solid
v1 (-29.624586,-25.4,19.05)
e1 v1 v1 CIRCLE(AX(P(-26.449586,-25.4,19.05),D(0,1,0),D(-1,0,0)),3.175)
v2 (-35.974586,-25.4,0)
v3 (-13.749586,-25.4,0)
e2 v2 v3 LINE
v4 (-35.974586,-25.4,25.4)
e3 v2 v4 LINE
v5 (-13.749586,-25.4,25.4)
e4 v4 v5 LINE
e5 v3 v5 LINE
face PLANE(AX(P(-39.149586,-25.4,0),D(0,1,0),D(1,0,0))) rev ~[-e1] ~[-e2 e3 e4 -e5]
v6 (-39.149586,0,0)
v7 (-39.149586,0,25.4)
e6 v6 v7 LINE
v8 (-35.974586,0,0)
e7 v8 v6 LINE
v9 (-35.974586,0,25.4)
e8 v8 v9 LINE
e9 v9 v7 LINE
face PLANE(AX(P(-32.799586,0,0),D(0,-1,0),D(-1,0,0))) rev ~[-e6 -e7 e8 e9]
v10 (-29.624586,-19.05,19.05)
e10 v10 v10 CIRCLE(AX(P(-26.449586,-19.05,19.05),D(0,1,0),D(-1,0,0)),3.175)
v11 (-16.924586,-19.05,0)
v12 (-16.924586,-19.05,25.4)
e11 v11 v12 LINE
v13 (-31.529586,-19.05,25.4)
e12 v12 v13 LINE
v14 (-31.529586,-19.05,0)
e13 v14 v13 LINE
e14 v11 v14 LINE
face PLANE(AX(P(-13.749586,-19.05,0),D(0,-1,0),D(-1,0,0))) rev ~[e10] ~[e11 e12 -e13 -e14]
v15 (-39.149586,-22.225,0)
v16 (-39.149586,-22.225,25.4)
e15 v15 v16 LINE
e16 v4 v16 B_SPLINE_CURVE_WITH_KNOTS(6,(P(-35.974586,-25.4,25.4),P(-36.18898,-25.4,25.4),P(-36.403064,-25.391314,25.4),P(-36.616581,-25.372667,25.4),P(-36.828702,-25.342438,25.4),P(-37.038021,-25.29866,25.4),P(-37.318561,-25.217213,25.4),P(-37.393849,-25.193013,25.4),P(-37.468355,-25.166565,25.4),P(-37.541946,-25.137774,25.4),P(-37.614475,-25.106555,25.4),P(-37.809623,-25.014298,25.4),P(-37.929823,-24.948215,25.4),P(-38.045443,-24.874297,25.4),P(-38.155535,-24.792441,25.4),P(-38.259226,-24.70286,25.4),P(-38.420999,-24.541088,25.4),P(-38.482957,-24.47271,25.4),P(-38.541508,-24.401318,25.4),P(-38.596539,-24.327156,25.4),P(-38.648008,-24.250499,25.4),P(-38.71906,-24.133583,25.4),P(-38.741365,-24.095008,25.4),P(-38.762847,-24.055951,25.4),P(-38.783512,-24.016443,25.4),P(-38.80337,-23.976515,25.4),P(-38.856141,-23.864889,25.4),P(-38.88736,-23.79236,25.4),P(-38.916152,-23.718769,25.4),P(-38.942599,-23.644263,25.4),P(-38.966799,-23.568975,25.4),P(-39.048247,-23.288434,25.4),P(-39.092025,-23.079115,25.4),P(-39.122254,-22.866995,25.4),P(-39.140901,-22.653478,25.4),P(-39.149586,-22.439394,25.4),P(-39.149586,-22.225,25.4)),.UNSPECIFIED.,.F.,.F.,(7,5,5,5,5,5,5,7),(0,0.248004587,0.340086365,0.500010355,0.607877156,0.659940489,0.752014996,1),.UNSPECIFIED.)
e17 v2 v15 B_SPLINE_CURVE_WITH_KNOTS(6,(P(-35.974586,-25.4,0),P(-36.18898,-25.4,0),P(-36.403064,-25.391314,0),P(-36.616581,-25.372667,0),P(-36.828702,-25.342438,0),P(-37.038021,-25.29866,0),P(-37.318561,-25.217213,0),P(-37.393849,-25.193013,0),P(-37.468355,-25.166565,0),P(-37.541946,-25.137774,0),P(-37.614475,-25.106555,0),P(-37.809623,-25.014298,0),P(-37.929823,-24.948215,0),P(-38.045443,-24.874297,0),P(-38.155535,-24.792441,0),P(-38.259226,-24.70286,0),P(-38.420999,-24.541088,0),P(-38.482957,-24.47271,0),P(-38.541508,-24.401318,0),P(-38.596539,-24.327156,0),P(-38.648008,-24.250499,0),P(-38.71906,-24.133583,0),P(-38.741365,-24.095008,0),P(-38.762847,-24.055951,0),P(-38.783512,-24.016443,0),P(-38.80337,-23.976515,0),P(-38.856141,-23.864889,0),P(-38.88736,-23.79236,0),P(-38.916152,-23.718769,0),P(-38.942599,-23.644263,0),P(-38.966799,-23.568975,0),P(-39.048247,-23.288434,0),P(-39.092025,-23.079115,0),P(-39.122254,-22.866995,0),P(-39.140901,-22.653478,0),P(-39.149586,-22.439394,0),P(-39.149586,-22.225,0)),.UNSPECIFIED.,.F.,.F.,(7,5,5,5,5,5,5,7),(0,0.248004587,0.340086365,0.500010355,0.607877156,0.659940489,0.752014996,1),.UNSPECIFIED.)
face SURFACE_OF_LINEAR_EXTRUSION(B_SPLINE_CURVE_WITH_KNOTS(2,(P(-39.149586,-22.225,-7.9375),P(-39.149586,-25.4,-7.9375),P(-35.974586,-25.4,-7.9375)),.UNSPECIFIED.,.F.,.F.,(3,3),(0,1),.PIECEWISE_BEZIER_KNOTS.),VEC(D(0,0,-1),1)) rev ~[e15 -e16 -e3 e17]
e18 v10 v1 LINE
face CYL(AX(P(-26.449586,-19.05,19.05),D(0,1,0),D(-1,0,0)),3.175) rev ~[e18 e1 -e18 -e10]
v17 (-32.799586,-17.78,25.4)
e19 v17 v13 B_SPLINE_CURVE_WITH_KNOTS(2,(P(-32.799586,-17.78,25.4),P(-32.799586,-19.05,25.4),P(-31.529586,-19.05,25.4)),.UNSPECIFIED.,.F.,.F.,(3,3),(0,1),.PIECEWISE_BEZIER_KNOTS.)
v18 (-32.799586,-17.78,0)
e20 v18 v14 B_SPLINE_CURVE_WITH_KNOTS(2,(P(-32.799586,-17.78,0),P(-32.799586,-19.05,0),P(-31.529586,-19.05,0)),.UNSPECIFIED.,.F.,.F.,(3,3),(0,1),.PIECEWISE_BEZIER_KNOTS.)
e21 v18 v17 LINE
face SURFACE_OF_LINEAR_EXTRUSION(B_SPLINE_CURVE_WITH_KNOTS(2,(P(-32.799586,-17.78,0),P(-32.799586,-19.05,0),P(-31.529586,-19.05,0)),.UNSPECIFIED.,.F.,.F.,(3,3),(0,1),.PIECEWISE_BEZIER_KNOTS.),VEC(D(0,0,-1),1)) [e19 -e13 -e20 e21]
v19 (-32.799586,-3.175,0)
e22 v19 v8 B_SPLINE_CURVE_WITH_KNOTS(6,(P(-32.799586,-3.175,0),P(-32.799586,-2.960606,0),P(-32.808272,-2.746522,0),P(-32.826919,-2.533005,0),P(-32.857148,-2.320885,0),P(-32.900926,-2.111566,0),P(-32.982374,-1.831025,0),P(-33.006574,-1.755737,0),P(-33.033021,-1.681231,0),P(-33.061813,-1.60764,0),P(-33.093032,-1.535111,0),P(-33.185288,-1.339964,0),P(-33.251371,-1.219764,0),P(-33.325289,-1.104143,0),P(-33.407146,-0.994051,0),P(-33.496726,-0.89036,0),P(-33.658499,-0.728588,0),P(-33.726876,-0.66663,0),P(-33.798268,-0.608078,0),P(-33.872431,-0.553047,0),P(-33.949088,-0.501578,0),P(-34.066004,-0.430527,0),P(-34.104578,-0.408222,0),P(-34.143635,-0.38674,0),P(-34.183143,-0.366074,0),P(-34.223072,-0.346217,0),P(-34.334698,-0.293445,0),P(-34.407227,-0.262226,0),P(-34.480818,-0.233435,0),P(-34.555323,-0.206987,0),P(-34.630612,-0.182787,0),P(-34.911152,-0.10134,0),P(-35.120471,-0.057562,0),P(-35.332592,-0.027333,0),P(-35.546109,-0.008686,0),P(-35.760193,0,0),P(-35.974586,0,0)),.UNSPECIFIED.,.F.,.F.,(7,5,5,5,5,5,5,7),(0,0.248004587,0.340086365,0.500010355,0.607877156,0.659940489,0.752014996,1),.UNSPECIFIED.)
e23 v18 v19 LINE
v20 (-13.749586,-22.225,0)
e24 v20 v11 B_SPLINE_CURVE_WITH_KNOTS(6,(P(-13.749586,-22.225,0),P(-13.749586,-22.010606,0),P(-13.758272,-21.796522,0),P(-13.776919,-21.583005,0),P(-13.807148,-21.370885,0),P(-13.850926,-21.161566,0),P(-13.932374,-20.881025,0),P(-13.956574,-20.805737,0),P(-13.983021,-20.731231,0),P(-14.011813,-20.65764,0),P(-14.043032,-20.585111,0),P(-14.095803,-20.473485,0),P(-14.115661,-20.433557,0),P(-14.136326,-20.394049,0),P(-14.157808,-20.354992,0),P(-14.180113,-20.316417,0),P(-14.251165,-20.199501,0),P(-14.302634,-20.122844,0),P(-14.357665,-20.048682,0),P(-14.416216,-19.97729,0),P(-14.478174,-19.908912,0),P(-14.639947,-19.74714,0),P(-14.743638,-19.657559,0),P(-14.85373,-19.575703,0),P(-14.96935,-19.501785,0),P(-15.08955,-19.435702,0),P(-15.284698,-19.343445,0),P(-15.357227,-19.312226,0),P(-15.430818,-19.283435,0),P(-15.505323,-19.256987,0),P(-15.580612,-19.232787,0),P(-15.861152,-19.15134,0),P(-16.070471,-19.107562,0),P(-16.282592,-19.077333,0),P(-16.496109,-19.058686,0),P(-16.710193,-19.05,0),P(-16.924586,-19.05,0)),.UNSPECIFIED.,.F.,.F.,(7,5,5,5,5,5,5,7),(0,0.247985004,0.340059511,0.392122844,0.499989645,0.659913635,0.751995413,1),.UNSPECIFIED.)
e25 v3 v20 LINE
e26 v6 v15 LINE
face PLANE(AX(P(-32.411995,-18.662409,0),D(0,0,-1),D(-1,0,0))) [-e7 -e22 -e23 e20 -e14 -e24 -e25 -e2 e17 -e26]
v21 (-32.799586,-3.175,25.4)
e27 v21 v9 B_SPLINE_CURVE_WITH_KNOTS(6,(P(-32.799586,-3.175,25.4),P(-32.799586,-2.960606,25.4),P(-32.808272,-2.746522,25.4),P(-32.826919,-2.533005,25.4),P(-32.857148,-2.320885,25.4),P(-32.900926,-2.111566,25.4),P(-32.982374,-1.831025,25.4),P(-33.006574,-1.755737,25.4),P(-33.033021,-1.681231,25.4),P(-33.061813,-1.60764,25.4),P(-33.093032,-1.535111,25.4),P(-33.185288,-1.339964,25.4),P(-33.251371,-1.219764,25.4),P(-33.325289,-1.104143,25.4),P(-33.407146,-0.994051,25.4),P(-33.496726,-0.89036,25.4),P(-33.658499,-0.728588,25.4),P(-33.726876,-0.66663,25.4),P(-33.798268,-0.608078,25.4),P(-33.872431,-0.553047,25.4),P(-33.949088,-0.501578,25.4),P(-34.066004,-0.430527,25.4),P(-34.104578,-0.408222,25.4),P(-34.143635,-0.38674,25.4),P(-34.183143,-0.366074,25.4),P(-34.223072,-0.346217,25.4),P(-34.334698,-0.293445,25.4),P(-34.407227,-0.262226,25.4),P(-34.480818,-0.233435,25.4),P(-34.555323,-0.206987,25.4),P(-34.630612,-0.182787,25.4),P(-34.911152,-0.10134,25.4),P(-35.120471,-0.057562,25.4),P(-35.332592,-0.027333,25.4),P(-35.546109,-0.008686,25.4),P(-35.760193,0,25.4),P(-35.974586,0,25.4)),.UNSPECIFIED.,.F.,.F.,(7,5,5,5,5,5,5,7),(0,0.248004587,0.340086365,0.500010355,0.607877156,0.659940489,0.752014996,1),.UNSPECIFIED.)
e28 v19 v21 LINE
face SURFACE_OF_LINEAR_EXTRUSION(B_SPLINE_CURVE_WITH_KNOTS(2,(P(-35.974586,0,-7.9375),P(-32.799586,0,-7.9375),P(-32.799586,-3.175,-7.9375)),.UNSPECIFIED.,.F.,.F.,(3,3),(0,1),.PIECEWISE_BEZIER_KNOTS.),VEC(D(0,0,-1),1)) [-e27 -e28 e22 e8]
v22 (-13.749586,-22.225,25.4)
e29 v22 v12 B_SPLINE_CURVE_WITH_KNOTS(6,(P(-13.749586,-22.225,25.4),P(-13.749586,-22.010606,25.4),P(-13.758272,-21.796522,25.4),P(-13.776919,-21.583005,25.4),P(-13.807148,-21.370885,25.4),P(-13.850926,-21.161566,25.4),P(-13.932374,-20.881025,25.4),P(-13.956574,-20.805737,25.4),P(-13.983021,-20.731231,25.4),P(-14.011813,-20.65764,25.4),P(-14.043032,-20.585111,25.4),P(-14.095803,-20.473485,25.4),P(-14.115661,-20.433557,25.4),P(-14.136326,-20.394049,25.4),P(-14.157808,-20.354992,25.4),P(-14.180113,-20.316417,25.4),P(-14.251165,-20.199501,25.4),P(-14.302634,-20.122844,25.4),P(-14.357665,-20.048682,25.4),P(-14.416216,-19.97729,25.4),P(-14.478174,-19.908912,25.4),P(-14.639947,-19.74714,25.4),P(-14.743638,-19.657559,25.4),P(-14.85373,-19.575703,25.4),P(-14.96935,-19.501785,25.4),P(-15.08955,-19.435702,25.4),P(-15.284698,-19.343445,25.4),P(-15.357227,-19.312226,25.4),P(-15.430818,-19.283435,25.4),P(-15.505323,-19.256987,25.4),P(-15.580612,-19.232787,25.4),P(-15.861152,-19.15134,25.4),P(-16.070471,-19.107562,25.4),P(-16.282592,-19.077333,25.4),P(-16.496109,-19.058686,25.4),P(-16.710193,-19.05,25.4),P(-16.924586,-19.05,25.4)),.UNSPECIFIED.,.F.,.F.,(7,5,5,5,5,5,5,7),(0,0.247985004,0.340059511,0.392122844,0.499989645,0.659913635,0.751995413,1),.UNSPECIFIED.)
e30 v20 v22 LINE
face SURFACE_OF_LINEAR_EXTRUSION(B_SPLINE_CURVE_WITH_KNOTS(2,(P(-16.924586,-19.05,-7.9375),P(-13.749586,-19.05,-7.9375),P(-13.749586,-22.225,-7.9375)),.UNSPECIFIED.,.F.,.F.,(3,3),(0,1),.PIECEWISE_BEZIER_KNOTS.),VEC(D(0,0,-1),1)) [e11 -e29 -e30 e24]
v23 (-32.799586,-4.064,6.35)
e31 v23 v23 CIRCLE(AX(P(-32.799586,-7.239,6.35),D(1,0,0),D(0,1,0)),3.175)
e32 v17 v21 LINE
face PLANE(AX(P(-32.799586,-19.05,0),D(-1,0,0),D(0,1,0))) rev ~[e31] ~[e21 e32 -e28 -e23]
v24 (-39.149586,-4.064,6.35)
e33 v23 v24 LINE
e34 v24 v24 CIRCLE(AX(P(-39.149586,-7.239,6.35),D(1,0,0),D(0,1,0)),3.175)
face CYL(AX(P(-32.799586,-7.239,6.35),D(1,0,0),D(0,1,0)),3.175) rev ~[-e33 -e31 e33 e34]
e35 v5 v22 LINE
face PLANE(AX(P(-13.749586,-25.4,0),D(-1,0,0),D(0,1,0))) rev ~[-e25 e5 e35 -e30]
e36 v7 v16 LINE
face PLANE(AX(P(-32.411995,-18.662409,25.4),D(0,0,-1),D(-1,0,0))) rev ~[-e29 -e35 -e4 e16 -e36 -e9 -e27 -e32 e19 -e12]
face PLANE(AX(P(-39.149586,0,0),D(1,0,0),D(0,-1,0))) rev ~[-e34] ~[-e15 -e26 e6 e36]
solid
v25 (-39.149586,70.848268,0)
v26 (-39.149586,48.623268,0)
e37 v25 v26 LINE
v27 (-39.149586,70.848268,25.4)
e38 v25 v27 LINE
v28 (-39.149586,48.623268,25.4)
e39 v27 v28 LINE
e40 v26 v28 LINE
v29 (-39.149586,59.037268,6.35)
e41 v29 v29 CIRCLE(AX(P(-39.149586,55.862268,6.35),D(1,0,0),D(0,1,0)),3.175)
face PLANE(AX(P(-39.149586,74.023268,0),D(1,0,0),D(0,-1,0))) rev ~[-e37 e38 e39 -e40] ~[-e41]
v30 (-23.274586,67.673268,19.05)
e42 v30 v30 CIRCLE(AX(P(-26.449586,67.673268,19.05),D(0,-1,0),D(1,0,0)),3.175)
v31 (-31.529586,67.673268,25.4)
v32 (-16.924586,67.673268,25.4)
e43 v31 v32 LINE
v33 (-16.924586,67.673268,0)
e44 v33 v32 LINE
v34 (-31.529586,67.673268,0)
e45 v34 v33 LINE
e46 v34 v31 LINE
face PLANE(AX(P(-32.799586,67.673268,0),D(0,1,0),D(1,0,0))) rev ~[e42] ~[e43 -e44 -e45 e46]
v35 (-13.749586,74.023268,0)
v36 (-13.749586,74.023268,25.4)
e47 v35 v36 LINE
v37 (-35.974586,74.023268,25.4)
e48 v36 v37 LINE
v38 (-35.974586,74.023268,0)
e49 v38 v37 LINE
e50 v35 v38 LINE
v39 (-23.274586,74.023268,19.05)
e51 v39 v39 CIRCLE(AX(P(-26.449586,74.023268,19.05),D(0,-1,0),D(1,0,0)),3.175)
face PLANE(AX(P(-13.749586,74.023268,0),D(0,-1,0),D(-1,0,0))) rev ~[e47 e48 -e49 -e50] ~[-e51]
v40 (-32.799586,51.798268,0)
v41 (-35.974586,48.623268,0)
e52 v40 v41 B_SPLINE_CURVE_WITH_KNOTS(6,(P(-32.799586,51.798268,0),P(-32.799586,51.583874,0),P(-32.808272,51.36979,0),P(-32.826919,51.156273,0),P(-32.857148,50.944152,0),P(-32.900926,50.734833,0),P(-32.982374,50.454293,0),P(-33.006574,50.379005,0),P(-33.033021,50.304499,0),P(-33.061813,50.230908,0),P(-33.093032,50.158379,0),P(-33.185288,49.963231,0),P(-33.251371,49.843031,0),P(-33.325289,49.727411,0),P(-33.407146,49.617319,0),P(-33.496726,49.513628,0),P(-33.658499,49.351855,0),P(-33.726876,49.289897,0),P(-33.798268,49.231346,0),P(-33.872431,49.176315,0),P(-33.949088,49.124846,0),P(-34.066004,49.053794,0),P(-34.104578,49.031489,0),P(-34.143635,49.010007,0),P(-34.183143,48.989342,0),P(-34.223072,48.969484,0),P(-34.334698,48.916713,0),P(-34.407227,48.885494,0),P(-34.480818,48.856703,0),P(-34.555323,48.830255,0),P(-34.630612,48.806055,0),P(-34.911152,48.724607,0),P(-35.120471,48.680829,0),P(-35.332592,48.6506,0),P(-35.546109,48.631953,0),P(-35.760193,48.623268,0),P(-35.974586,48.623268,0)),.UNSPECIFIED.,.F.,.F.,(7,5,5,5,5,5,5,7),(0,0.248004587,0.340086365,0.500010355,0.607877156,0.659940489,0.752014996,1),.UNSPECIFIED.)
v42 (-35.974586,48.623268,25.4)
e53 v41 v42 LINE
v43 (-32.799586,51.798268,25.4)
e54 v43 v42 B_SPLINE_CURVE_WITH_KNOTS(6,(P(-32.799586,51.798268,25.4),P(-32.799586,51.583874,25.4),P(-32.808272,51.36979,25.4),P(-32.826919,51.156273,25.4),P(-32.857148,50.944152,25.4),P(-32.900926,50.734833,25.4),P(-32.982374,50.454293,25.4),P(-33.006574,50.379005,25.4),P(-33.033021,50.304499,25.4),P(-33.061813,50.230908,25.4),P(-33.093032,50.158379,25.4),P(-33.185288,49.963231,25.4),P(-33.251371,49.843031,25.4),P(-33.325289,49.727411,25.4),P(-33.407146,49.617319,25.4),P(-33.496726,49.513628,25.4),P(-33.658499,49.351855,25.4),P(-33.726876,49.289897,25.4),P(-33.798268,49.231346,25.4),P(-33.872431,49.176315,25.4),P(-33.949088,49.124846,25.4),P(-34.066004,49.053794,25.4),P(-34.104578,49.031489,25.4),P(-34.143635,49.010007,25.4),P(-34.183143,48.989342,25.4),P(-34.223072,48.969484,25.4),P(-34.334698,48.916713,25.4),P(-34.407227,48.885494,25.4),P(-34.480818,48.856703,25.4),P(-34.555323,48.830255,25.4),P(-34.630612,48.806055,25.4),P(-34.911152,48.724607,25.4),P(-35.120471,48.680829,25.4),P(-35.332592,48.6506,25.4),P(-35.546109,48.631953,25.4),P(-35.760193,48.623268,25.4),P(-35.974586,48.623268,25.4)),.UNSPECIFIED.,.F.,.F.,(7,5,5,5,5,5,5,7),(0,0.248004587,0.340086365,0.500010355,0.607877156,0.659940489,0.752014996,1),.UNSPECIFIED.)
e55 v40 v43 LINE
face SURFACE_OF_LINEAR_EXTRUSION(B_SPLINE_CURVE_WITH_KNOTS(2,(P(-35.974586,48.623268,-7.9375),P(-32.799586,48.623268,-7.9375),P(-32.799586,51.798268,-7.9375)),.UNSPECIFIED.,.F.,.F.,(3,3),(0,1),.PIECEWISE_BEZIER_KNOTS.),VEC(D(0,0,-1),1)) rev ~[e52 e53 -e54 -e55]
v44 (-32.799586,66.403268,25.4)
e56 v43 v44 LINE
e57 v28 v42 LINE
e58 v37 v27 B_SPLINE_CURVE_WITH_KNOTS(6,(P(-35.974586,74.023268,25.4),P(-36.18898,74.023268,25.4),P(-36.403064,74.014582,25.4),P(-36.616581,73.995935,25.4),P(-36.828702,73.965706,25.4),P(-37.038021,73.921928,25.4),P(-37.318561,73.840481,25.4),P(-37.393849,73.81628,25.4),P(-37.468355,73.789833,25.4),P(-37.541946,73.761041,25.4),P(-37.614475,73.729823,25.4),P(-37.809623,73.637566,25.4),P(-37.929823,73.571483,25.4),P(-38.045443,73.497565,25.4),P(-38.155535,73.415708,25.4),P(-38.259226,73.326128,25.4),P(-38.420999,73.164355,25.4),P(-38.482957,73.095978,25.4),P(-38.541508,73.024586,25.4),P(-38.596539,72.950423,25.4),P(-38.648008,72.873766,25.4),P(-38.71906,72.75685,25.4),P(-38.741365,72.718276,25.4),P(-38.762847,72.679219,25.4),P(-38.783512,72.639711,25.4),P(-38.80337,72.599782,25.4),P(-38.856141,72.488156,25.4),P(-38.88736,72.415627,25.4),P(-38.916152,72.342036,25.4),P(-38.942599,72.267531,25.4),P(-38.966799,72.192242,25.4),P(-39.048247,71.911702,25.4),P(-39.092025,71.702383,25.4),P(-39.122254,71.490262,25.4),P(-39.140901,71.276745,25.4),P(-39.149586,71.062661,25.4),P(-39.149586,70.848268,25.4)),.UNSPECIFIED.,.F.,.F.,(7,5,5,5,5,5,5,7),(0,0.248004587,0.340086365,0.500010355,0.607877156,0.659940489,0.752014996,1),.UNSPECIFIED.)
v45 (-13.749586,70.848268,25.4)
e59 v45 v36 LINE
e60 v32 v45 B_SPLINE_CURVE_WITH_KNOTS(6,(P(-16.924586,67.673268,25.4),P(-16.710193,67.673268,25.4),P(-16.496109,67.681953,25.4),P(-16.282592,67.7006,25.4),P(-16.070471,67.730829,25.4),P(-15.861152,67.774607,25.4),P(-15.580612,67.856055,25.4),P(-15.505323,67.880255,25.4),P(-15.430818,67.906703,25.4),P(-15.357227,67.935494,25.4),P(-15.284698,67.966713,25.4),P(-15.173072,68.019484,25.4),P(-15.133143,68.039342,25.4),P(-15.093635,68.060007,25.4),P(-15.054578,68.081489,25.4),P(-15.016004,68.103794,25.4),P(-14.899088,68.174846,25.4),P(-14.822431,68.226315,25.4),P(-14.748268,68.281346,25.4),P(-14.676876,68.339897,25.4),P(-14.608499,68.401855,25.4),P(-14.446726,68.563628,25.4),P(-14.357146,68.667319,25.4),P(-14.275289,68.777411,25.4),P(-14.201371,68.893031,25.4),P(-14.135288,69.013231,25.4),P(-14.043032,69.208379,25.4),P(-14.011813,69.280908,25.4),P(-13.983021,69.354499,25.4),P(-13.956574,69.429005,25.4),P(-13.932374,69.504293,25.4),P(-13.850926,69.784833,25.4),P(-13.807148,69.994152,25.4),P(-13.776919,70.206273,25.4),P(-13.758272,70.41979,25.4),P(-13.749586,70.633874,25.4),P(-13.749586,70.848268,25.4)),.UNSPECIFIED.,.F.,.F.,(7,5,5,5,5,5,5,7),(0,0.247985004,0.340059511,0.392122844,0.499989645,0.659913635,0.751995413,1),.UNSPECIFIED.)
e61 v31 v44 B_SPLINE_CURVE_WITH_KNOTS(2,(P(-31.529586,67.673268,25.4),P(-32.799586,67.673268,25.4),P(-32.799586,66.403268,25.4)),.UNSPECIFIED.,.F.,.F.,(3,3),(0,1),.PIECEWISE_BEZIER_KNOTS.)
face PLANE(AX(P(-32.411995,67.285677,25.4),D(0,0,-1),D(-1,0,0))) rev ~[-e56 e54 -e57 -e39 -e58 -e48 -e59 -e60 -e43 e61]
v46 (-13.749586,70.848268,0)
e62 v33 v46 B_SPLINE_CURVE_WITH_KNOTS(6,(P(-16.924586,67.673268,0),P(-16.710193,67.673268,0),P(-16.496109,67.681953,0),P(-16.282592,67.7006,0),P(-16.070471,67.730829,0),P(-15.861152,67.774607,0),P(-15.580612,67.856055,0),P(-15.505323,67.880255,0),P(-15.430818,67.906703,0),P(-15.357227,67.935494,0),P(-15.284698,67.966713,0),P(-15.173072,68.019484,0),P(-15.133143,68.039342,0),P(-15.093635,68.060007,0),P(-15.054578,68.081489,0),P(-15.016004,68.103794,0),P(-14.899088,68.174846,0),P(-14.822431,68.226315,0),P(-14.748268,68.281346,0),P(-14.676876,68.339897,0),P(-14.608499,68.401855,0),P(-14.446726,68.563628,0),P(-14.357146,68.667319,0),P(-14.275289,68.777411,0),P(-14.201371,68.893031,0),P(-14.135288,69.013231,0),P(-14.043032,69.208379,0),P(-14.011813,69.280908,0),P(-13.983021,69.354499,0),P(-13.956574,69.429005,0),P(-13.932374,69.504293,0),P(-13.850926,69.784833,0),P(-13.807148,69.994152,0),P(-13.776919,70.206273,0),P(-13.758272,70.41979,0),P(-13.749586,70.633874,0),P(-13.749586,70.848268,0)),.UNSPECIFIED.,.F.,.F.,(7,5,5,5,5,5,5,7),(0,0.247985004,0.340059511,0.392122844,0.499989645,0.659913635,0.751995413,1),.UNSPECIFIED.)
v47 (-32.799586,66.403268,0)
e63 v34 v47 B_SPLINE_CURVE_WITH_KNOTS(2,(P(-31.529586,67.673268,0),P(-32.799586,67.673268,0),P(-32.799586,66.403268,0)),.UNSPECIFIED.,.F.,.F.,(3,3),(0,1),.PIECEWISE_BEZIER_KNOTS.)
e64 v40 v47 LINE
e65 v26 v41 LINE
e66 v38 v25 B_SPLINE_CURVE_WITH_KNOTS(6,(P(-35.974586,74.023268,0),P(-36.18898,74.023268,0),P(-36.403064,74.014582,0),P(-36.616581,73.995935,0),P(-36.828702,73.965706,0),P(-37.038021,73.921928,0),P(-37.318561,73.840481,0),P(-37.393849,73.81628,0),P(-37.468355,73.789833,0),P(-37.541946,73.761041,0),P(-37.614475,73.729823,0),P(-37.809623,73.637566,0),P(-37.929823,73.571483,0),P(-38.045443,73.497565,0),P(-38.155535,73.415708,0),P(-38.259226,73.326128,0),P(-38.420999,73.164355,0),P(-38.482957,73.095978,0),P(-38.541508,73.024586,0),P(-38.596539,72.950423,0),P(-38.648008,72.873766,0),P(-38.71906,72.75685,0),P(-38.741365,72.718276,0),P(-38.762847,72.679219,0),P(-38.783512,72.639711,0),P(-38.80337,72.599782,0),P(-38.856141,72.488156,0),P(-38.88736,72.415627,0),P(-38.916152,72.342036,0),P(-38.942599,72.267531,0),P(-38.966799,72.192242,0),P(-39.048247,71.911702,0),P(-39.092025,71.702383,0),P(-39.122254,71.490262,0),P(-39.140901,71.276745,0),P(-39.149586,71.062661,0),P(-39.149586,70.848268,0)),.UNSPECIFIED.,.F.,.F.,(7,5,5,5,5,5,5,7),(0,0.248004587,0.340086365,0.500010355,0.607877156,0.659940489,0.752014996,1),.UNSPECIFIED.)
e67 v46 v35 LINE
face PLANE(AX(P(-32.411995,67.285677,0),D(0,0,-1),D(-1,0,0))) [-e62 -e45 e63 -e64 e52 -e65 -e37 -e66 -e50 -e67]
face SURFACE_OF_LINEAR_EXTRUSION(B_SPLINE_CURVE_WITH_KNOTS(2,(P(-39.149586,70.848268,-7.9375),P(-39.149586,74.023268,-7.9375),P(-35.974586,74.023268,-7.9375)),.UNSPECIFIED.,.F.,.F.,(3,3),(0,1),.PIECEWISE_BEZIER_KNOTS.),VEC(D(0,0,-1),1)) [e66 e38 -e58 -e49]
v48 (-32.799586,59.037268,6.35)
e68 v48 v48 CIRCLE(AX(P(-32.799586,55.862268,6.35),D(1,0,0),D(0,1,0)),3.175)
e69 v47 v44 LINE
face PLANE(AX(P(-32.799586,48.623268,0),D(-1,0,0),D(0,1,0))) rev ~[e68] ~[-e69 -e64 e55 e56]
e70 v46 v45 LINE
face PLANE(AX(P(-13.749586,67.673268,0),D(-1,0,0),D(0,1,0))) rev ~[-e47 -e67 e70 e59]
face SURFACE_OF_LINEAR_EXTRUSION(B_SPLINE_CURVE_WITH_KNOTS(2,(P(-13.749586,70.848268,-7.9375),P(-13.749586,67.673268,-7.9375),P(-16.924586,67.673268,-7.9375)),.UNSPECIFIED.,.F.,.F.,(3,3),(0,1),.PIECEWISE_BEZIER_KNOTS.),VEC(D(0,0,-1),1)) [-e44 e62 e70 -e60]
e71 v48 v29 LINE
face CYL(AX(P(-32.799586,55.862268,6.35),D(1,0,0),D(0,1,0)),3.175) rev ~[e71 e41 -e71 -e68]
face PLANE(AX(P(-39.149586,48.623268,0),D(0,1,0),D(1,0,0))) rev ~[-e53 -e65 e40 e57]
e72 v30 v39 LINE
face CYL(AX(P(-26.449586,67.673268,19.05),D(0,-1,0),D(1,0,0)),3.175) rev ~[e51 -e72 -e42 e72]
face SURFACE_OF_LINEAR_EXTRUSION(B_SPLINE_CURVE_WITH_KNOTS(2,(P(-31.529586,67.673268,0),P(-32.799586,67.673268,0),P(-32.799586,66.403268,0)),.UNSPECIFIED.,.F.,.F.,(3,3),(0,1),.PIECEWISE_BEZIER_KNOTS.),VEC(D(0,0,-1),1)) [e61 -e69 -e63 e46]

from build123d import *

# Parameters (mm, degrees)
F1_DEPTH       = 25.4
F3_R           = 3.175
F4_DEPTH       = 6.35
F2_R           = 3.175
F5_DEPTH       = 6.35
F7_DEPTH       = 25.4
F8_R           = 3.175
F9_DEPTH       = 6.35
F10_R          = 3.175
F11_DEPTH      = 6.35
F12_T1_DEPTH   = 41.275
F12_2_T1_DEPTH = 41.275
F13_T1_DEPTH   = 41.275
F13_2_T1_DEPTH = 41.275
F14_T1_DEPTH   = 25.4
F14_2_T1_DEPTH = 25.4


# Not quite as in the source:
# - a fillet or chamfer that OpenCascade refuses, or shapes differently, is made with other operations: its cross-section is extruded or revolved along the edge and cut away or added


with BuildPart() as f1:
    # F0 (on Top) → F1 (new body)
    with BuildSketch(Plane.XY):
        Polygon((-32.7995864883, 0), (-39.1495864883, 0), (-39.1495864883, -25.4), (-13.7495864883, -25.4), (-13.7495864883, -19.05), (-32.7995864883, -19.05), align=None)
    extrude(amount=F1_DEPTH)

    # F3 (on face) → F4 (cut)
    with BuildSketch(Plane(origin=(0, -19.05, 0), x_dir=(-1, 0, 0), z_dir=(0, 1, 0))):
        with Locations((26.4495864883, 19.05)):
            Circle(F3_R)
    extrude(amount=-F4_DEPTH, mode=Mode.SUBTRACT)

    # F2 (on face) → F5 (cut)
    with BuildSketch(Plane.YZ.offset(-32.7995864883)):
        with Locations((-7.239, 6.35)):
            Circle(F2_R)
    extrude(amount=-F5_DEPTH, mode=Mode.SUBTRACT)

    # F12#2: fillet of radius 3.175 on 2 edges, made by hand

    # F12_2_s2 → F12_2_t1 (cut)
    with BuildSketch(Plane.XY.offset(-7.9375)):
        with BuildLine():
            add(Edge.make_bspline(
                [(-35.9745864883, 0), (-32.7995864883, 0), (-32.7995864883, -3.175)],
                knots=[0, 0, 0, 1, 1, 1], degree=2, weights=[1, 1, 1]))
            Line((-32.7995864883, -3.175), (-32.7995864883, 0))
            Line((-32.7995864883, 0), (-35.9745864883, 0))
        make_face()
        with BuildLine():
            add(Edge.make_bspline(
                [(-16.9245864883, -19.05), (-13.7495864883, -19.05), (-13.7495864883, -22.225)],
                knots=[0, 0, 0, 1, 1, 1], degree=2, weights=[1, 1, 1]))
            Line((-13.7495864883, -22.225), (-13.7495864883, -19.05))
            Line((-13.7495864883, -19.05), (-16.9245864883, -19.05))
        make_face()
    extrude(amount=F12_2_T1_DEPTH, mode=Mode.SUBTRACT)

    # F13: fillet of radius 3.175 on 1 edges, made by hand

    # F13_s2 → F13_t1 (cut)
    with BuildSketch(Plane.XY.offset(-7.9375)):
        with BuildLine():
            add(Edge.make_bspline(
                [(-39.1495864883, -22.225), (-39.1495864883, -25.4), (-35.9745864883, -25.4)],
                knots=[0, 0, 0, 1, 1, 1], degree=2, weights=[1, 1, 1]))
            Line((-35.9745864883, -25.4), (-39.1495864883, -25.4))
            Line((-39.1495864883, -25.4), (-39.1495864883, -22.225))
        make_face()
    extrude(amount=F13_T1_DEPTH, mode=Mode.SUBTRACT)

    # F14#2: fillet of radius 1.27 on 1 edges, made by hand

    # F14_2_s2 → F14_2_t1 (join)
    with BuildSketch(Plane.XY):
        with BuildLine():
            add(Edge.make_bspline(
                [(-32.7995864883, -17.78), (-32.7995864883, -19.05), (-31.5295864883, -19.05)],
                knots=[0, 0, 0, 1, 1, 1], degree=2, weights=[1, 1, 1]))
            Line((-31.5295864883, -19.05), (-32.7995864883, -19.05))
            Line((-32.7995864883, -19.05), (-32.7995864883, -17.78))
        make_face()
    extrude(amount=F14_2_T1_DEPTH)


with BuildPart() as f7:
    # F6 (on Top) → F7 (new body)
    with BuildSketch(Plane.XY):
        Polygon((-39.1495864883, 48.6232675612), (-32.7995864883, 48.6232675612), (-32.7995864883, 67.6732675612), (-13.7495864883, 67.6732675612), (-13.7495864883, 74.0232675612), (-39.1495864883, 74.0232675612), align=None)
    extrude(amount=F7_DEPTH)

    # F8 (on face) → F9 (cut)
    with BuildSketch(Plane.YZ.offset(-32.7995864883)):
        with Locations((55.8622675612, 6.35)):
            Circle(F8_R)
    extrude(amount=-F9_DEPTH, mode=Mode.SUBTRACT)

    # F10 (on face) → F11 (cut)
    with BuildSketch(Plane.XZ.offset(-67.6732675612)):
        with Locations((-26.4495864883, 19.05)):
            Circle(F10_R)
    extrude(amount=-F11_DEPTH, mode=Mode.SUBTRACT)

    # F12: fillet of radius 3.175 on 2 edges, made by hand

    # F12_s2 → F12_t1 (cut)
    with BuildSketch(Plane.XY.offset(-7.9375)):
        with BuildLine():
            add(Edge.make_bspline(
                [(-13.7495864883, 70.8482675612), (-13.7495864883, 67.6732675612), (-16.9245864883, 67.6732675612)],
                knots=[0, 0, 0, 1, 1, 1], degree=2, weights=[1, 1, 1]))
            Line((-16.9245864883, 67.6732675612), (-13.7495864883, 67.6732675612))
            Line((-13.7495864883, 67.6732675612), (-13.7495864883, 70.8482675612))
        make_face()
        with BuildLine():
            add(Edge.make_bspline(
                [(-35.9745864883, 48.6232675612), (-32.7995864883, 48.6232675612), (-32.7995864883, 51.7982675612)],
                knots=[0, 0, 0, 1, 1, 1], degree=2, weights=[1, 1, 1]))
            Line((-32.7995864883, 51.7982675612), (-32.7995864883, 48.6232675612))
            Line((-32.7995864883, 48.6232675612), (-35.9745864883, 48.6232675612))
        make_face()
    extrude(amount=F12_T1_DEPTH, mode=Mode.SUBTRACT)

    # F13#2: fillet of radius 3.175 on 1 edges, made by hand

    # F13_2_s2 → F13_2_t1 (cut)
    with BuildSketch(Plane.XY.offset(-7.9375)):
        with BuildLine():
            add(Edge.make_bspline(
                [(-39.1495864883, 70.8482675612), (-39.1495864883, 74.0232675612), (-35.9745864883, 74.0232675612)],
                knots=[0, 0, 0, 1, 1, 1], degree=2, weights=[1, 1, 1]))
            Line((-35.9745864883, 74.0232675612), (-39.1495864883, 74.0232675612))
            Line((-39.1495864883, 74.0232675612), (-39.1495864883, 70.8482675612))
        make_face()
    extrude(amount=F13_2_T1_DEPTH, mode=Mode.SUBTRACT)

    # F14: fillet of radius 1.27 on 1 edges, made by hand

    # F14_s2 → F14_t1 (join)
    with BuildSketch(Plane.XY):
        with BuildLine():
            add(Edge.make_bspline(
                [(-31.5295864883, 67.6732675612), (-32.7995864883, 67.6732675612), (-32.7995864883, 66.4032675612)],
                knots=[0, 0, 0, 1, 1, 1], degree=2, weights=[1, 1, 1]))
            Line((-32.7995864883, 66.4032675612), (-32.7995864883, 67.6732675612))
            Line((-32.7995864883, 67.6732675612), (-31.5295864883, 67.6732675612))
        make_face()
    extrude(amount=F14_T1_DEPTH)


solid = Compound([f1.part, f7.part])
